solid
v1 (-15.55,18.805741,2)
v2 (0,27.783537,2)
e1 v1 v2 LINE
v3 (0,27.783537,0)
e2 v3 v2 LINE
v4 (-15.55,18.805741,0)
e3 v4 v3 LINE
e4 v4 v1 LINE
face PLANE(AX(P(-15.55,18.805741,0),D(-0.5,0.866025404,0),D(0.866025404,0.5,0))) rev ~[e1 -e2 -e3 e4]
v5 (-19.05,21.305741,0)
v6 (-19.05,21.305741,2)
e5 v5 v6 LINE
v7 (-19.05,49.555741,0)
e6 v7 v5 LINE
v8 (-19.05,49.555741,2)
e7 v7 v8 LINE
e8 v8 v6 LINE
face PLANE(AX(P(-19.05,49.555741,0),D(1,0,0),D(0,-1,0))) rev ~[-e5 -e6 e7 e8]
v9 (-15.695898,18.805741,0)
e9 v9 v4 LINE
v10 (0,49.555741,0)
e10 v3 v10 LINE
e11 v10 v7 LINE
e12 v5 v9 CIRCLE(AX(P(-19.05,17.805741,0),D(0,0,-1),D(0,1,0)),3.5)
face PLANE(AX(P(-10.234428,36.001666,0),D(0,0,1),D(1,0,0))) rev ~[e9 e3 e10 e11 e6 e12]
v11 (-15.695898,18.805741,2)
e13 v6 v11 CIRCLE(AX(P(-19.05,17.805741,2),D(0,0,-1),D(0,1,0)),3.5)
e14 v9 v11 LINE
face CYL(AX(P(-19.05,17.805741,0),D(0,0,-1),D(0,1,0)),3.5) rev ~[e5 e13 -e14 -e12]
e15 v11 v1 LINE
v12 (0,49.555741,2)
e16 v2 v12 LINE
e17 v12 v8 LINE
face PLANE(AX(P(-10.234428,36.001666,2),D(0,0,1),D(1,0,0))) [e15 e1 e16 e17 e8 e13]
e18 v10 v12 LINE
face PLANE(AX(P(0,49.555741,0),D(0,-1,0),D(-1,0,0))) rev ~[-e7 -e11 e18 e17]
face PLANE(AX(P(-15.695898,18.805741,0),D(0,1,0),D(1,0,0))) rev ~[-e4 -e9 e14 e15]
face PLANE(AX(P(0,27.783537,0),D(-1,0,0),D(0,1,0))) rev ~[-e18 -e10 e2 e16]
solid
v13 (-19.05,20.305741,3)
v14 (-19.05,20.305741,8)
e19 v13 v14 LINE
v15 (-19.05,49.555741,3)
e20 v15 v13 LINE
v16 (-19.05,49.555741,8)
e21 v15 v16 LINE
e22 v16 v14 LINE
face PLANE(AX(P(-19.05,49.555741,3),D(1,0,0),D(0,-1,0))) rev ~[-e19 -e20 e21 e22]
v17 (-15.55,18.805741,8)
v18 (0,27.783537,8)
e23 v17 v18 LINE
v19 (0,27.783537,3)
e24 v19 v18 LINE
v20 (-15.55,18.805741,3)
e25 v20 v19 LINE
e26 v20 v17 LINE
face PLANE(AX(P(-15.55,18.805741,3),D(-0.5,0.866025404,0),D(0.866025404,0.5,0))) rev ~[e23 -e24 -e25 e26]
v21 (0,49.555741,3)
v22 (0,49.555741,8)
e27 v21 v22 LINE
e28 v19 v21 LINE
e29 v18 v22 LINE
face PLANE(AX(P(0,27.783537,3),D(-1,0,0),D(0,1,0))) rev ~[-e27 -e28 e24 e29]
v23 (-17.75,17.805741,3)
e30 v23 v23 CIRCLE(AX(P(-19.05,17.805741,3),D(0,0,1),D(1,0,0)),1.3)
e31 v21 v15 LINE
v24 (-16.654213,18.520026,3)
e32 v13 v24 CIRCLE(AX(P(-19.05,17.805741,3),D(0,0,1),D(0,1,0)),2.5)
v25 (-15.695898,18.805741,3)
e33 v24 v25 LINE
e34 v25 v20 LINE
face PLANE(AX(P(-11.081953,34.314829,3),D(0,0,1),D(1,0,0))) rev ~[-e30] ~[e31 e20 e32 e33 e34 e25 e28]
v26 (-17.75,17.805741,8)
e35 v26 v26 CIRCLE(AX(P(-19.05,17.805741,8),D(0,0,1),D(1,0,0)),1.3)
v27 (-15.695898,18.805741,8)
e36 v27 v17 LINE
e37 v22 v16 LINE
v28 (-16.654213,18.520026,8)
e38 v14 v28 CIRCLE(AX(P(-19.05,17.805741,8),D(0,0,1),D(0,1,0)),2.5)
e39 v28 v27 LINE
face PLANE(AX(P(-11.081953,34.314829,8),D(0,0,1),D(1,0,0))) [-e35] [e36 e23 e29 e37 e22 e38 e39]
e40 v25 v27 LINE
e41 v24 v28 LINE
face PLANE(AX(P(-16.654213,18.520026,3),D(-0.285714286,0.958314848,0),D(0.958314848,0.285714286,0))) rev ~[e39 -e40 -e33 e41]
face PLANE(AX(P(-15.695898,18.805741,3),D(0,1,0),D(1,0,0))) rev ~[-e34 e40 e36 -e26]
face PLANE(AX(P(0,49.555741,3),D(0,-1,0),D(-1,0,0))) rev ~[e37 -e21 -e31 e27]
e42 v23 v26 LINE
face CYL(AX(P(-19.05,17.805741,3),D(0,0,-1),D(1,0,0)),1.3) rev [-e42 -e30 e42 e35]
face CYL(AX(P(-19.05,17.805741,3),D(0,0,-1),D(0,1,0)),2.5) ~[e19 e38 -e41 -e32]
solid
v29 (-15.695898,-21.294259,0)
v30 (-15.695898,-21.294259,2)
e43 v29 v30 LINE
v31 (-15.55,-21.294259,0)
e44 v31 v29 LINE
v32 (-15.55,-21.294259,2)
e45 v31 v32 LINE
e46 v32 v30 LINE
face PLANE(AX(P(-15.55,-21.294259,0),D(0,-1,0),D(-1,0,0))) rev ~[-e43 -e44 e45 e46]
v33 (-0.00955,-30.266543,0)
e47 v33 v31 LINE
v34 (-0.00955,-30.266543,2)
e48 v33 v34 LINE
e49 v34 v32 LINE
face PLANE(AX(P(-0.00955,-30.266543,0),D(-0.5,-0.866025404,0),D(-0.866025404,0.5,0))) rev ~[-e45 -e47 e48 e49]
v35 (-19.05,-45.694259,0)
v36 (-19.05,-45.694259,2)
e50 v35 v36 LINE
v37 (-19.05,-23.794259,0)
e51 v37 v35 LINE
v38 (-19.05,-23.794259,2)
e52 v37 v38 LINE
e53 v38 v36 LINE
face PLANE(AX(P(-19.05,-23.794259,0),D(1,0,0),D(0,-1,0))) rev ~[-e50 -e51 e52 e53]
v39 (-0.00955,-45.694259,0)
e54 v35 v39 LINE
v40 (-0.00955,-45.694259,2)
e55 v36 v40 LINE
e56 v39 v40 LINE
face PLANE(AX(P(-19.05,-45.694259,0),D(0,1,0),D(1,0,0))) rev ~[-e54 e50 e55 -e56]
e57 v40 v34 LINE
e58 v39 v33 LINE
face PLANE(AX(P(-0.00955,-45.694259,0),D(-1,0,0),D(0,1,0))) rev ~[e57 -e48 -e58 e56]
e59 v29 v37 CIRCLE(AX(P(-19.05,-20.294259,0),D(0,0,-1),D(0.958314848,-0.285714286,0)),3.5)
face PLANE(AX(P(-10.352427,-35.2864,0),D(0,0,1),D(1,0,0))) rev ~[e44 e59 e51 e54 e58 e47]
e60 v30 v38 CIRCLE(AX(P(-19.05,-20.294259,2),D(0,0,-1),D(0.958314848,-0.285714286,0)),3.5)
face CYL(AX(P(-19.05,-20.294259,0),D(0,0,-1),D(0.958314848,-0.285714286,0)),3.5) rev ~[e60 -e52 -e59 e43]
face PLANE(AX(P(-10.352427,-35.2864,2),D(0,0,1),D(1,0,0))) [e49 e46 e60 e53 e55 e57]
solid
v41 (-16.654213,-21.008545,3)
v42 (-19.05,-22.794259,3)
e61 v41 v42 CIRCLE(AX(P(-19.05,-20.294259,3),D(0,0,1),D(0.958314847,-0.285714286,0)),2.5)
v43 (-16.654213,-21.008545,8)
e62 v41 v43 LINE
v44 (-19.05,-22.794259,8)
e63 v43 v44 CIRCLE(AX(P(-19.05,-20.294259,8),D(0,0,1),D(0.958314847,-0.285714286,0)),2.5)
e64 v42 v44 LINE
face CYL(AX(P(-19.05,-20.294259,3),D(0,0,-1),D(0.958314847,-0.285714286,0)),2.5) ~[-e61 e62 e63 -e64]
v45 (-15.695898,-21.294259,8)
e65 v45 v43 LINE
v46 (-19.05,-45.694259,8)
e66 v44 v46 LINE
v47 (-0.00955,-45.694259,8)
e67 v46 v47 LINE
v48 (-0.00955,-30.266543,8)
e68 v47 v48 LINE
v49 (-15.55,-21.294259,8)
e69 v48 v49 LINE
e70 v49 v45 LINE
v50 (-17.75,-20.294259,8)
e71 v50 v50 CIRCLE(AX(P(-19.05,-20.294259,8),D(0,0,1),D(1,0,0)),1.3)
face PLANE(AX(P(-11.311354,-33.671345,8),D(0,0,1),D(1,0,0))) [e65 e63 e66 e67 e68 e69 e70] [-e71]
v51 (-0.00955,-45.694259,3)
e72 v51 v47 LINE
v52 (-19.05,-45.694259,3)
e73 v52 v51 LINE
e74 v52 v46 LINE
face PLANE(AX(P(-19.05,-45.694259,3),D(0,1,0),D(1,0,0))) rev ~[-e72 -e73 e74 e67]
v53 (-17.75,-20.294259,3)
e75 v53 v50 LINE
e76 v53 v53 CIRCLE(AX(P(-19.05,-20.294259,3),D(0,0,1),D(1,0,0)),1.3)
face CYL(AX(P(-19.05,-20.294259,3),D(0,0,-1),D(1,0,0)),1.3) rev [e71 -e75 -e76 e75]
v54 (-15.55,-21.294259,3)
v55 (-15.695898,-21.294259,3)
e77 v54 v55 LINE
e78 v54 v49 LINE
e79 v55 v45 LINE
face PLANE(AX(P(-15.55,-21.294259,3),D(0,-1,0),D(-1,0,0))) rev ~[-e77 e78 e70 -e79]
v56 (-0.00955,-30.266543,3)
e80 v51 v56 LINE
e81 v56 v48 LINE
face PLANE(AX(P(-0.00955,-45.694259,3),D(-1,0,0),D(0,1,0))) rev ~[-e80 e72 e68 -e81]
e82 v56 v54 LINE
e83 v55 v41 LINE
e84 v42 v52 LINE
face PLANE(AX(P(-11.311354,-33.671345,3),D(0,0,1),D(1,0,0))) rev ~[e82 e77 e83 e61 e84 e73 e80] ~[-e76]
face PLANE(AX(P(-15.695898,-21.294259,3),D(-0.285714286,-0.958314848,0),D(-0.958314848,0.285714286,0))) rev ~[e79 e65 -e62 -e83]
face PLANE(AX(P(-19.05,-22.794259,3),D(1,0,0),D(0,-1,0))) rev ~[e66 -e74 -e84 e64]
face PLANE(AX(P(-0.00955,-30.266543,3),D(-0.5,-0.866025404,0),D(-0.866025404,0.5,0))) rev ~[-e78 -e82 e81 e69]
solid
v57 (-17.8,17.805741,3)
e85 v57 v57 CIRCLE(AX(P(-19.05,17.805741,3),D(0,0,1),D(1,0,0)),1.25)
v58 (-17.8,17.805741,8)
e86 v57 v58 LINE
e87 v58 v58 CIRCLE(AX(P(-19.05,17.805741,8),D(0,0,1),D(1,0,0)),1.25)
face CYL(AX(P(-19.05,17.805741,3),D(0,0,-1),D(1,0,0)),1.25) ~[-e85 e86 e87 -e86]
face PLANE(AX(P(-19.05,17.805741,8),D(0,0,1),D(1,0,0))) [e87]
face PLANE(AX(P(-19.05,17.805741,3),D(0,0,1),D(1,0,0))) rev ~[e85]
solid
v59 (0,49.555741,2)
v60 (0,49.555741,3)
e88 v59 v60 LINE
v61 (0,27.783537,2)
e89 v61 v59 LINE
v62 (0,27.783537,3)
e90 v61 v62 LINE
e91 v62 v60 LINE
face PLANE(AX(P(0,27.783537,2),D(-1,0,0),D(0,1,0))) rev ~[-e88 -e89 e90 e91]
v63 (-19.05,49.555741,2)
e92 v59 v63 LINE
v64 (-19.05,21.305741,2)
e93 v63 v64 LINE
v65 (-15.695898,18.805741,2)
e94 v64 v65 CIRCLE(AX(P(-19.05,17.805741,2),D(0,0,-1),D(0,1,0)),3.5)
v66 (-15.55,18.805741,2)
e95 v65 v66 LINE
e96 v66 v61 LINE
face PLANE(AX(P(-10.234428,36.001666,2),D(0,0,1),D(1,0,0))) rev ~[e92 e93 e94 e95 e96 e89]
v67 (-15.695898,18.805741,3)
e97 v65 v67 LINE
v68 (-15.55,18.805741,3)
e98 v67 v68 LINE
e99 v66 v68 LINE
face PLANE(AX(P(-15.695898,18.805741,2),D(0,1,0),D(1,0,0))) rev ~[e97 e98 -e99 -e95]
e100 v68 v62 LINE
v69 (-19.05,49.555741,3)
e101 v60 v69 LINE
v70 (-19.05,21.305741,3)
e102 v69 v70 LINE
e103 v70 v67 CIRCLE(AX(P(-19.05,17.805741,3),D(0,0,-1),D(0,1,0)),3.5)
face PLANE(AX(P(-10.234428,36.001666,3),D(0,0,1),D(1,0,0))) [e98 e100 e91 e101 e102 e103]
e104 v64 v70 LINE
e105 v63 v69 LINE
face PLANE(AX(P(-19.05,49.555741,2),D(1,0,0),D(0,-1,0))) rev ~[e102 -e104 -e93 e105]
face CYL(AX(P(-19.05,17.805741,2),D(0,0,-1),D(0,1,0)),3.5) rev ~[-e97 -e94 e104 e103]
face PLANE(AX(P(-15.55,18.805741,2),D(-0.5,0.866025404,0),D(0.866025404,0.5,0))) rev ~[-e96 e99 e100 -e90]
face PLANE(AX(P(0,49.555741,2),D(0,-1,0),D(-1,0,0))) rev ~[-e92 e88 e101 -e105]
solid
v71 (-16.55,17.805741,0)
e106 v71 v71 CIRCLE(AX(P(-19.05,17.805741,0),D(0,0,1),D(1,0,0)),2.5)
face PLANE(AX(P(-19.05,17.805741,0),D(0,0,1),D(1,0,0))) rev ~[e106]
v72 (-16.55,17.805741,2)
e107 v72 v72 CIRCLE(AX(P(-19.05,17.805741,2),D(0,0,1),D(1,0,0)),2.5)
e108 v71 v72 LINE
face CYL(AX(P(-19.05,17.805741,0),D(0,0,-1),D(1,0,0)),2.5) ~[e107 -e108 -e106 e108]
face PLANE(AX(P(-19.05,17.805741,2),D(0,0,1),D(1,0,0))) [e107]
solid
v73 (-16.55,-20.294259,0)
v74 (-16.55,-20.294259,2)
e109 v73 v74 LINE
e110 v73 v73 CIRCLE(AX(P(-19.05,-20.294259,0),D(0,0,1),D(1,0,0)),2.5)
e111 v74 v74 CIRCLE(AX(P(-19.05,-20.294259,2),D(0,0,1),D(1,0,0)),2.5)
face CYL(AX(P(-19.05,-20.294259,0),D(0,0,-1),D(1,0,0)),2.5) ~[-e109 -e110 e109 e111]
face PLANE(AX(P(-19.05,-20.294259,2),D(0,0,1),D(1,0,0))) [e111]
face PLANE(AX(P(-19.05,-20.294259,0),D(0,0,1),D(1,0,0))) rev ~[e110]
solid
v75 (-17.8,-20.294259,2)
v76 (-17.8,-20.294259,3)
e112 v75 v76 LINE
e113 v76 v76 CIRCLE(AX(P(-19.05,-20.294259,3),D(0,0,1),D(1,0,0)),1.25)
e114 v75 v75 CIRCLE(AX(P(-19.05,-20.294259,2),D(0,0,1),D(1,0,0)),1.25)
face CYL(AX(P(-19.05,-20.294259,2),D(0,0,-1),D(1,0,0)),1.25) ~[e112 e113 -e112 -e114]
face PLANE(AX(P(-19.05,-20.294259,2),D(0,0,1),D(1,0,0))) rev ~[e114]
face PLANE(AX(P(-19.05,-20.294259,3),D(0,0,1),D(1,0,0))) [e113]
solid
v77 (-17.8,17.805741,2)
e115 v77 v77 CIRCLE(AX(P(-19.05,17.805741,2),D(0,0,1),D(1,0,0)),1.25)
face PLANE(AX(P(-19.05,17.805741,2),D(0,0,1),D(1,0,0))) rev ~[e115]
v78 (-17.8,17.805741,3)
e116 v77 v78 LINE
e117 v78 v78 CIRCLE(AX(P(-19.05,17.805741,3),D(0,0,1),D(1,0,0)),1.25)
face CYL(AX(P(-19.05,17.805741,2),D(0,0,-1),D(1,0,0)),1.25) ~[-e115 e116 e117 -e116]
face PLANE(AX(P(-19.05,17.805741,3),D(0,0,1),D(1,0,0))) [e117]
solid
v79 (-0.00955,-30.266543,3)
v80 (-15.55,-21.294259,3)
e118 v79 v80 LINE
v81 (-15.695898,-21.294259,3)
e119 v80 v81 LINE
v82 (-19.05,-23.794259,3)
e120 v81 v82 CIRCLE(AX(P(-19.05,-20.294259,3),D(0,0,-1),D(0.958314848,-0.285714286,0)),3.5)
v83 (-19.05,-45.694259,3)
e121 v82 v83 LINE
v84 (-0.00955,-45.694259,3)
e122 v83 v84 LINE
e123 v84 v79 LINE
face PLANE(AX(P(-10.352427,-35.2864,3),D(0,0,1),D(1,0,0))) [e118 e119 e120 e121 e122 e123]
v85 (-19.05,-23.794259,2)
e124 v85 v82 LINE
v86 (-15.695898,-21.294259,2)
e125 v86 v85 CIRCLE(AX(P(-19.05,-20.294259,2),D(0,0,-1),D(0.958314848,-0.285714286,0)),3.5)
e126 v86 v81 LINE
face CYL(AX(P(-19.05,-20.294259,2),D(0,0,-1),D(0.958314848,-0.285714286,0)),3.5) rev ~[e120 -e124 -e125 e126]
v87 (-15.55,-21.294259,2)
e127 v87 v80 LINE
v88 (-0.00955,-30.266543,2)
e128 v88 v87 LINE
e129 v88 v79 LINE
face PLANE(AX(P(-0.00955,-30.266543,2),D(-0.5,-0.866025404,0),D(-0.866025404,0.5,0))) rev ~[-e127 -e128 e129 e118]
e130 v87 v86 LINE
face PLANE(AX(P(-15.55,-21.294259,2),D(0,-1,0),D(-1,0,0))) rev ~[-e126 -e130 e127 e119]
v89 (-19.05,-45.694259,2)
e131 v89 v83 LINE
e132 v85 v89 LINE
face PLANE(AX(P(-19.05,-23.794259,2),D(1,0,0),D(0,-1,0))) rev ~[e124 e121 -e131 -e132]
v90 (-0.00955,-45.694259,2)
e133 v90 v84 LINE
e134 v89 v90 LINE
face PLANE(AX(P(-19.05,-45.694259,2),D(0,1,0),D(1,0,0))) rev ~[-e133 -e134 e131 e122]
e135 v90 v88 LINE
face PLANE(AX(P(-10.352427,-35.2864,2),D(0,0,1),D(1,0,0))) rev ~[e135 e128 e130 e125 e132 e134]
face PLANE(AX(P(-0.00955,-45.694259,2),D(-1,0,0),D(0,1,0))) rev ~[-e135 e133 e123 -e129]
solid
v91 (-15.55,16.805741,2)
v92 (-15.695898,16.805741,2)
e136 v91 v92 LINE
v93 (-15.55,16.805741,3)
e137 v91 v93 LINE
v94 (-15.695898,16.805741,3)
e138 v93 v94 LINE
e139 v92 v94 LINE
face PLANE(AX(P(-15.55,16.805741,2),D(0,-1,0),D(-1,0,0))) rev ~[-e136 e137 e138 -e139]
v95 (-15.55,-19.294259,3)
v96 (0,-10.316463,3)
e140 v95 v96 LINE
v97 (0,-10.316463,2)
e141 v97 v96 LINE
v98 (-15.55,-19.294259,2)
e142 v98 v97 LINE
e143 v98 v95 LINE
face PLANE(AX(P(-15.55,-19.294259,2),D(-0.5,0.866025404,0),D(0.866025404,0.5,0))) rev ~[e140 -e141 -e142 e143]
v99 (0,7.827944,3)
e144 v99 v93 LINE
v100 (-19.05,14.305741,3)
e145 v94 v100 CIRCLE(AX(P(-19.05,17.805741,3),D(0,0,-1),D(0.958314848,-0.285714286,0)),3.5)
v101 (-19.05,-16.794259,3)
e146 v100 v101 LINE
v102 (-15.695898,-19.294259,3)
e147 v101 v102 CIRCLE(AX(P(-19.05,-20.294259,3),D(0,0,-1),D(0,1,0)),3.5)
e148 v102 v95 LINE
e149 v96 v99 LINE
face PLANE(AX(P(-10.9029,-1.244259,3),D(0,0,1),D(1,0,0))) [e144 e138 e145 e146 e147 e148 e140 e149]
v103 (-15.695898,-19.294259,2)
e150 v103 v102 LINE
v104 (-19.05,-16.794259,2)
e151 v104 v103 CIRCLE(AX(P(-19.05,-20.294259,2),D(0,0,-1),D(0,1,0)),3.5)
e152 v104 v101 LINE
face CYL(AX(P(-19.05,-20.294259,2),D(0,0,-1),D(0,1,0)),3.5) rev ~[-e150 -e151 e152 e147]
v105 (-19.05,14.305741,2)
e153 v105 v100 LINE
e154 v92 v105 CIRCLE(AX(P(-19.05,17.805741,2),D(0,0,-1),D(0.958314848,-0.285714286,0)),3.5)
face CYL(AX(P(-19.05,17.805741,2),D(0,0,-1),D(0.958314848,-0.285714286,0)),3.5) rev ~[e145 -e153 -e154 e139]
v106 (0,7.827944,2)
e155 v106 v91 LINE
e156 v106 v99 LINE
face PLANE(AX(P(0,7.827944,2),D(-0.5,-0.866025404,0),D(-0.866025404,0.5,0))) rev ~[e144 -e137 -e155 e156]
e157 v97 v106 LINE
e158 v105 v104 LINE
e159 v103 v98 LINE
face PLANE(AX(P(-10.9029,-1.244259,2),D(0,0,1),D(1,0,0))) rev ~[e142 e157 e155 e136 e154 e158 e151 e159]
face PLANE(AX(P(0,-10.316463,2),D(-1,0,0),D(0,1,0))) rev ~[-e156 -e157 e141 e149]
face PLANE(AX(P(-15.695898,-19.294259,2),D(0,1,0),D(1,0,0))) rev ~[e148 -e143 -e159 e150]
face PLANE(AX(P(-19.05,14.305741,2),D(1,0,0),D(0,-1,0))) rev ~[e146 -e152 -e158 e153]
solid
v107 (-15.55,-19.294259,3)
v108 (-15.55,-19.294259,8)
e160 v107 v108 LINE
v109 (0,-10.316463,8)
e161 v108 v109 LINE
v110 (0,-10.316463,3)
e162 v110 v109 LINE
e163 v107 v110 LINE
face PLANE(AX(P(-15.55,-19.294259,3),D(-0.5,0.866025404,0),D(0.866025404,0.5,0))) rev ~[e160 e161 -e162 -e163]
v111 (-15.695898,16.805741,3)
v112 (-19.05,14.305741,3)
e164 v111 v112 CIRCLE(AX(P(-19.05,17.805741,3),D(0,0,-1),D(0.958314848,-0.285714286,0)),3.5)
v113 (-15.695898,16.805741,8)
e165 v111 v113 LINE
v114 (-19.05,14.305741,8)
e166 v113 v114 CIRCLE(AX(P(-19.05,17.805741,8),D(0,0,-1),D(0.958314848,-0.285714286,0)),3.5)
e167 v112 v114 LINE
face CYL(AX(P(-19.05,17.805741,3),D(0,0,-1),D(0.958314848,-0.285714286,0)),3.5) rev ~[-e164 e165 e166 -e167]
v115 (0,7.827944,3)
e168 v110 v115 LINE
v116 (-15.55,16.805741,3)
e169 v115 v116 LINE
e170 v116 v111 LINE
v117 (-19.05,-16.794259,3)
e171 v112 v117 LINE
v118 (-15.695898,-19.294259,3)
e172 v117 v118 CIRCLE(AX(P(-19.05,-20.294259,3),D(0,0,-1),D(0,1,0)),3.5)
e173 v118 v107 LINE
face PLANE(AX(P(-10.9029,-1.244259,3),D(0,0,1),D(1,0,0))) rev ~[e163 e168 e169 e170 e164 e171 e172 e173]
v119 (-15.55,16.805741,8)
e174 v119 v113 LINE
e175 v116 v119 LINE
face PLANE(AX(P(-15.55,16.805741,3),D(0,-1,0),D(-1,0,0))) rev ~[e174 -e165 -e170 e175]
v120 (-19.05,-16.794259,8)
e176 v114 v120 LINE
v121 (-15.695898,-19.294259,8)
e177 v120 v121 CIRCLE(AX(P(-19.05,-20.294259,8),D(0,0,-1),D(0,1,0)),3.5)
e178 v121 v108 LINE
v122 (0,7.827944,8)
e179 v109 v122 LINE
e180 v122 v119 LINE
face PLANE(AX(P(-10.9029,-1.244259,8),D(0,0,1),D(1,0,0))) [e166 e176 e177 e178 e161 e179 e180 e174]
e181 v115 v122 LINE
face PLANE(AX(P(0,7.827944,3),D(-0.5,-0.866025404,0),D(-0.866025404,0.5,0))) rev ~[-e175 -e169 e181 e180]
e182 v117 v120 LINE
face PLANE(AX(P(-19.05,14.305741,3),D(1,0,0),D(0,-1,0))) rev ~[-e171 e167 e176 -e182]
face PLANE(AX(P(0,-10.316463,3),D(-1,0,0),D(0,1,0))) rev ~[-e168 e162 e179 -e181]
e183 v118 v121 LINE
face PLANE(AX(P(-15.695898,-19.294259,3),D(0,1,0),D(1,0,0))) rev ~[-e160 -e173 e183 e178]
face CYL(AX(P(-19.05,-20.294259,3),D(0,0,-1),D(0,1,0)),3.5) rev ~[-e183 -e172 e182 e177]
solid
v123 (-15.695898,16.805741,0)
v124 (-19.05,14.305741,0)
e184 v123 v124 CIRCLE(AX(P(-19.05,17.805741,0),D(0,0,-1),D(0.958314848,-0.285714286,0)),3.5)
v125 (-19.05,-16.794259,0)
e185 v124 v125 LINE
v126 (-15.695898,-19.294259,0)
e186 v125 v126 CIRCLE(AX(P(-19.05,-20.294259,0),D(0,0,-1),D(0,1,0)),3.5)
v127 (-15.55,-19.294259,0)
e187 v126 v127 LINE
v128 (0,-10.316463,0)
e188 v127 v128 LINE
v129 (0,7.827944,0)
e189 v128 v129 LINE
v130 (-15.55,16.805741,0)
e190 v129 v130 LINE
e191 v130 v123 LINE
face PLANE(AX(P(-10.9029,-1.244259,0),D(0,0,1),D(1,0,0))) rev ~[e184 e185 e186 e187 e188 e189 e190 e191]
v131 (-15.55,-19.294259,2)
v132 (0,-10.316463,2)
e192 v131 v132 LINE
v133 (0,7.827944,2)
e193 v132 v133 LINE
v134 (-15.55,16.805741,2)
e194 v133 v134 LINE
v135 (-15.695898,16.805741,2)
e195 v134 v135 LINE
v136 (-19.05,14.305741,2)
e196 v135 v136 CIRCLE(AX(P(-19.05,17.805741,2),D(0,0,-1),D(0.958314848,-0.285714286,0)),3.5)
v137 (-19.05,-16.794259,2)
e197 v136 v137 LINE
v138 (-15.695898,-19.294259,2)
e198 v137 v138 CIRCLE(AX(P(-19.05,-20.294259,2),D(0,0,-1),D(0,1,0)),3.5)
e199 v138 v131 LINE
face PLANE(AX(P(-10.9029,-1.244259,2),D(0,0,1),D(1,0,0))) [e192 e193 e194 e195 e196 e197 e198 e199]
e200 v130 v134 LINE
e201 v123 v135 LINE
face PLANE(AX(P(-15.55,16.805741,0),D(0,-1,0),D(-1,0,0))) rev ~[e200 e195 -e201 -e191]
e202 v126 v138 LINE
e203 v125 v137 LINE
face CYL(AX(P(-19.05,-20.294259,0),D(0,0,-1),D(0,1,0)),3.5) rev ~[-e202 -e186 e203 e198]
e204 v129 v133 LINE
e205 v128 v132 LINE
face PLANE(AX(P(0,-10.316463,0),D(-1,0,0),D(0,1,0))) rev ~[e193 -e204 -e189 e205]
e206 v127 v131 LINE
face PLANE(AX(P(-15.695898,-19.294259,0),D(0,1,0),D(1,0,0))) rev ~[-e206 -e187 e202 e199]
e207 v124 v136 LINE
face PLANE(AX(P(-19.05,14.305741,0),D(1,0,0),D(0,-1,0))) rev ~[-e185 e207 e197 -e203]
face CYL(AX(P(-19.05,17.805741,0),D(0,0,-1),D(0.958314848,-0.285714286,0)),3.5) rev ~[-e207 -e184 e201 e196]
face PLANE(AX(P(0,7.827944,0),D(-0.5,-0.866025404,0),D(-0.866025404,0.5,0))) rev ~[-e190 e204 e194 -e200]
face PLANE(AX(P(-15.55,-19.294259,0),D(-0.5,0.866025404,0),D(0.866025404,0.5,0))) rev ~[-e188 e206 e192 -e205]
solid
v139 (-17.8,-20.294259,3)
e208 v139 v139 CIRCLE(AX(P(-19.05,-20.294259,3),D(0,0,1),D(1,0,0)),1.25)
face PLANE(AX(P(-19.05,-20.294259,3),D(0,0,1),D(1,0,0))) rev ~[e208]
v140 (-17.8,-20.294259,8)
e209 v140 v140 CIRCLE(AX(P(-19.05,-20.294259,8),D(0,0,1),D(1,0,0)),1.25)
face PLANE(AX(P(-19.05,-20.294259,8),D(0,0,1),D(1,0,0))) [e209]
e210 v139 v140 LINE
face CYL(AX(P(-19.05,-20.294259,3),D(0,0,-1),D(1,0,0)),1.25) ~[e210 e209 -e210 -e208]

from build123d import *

# Parameters (mm, degrees)
F1_DEPTH = 2
F0_R     = 2.5
F3_DEPTH = 1
F2_R     = 1.25
F4_R     = 1.3
F5_DEPTH = 5
F4_R_2   = 1.25


# Not quite as in the source:
# - a feature of the source that left no trace in its solid (it failed there, or was rolled back) is left out


with BuildPart() as f1:
    # F0 (on Top) → F1 (new body)
    with BuildSketch(Plane.XY):
        with BuildLine():
            Line((0, 49.5557405042), (-19.05, 49.5557405042))
            Line((-19.05, 49.5557405042), (-19.05, 21.3057405042))
            ThreePointArc((-19.05, 21.3057405042), (-16.9583499337, 20.6119835443), (-15.6958980338, 18.8057405042))
            Line((-15.6958980338, 18.8057405042), (-15.55, 18.8057405042))
            Line((-15.55, 18.8057405042), (0, 27.7835371901))
            Line((0, 27.7835371901), (0, 49.5557405042))
        make_face()
    extrude(amount=F1_DEPTH)


with BuildPart() as f1b:
    # F0 (on Top) → F1, piece 2 (new body)
    with BuildSketch(Plane.XY):
        with BuildLine():
            Line((0, -10.3164628099), (0, 7.8279438183))
            Line((0, 7.8279438183), (-15.55, 16.8057405042))
            Line((-15.55, 16.8057405042), (-15.6958980338, 16.8057405042))
            ThreePointArc((-15.6958980338, 16.8057405042), (-16.9583499337, 14.9994974641), (-19.05, 14.3057405042))
            Line((-19.05, 14.3057405042), (-19.05, -16.7942594958))
            ThreePointArc((-19.05, -16.7942594958), (-16.9583499337, -17.4880164557), (-15.6958980338, -19.2942594958))
            Line((-15.6958980338, -19.2942594958), (-15.55, -19.2942594958))
            Line((-15.55, -19.2942594958), (0, -10.3164628099))
        make_face()
    extrude(amount=F1_DEPTH)


with BuildPart() as f1c:
    # F0 (on Top) → F1, piece 3 (new body)
    with BuildSketch(Plane.XY):
        with BuildLine():
            Line((-19.05, -23.7942594958), (-19.05, -45.6942594958))
            Line((-19.05, -45.6942594958), (-0.0095496495, -45.6942594958))
            Line((-0.0095496495, -45.6942594958), (-0.0095496495, -30.266542689))
            Line((-0.0095496495, -30.266542689), (-15.55, -21.2942594958))
            Line((-15.55, -21.2942594958), (-15.6958980338, -21.2942594958))
            ThreePointArc((-15.6958980338, -21.2942594958), (-16.9583499337, -23.1005025359), (-19.05, -23.7942594958))
        make_face()
    extrude(amount=F1_DEPTH)


with BuildPart() as f1d:
    # F0 (on Top) → F1, piece 4 (new body)
    with BuildSketch(Plane.XY):
        with Locations((-19.05, 17.8057405042)):
            Circle(F0_R)
    extrude(amount=F1_DEPTH)


with BuildPart() as f1e:
    # F0 (on Top) → F1, piece 5 (new body)
    with BuildSketch(Plane.XY):
        with Locations((-19.05, -20.2942594958)):
            Circle(F0_R)
    extrude(amount=F1_DEPTH)


with BuildPart() as f3:
    # F2 (on face) → F3 (new body)
    with BuildSketch(Plane.XY.offset(2)):
        with BuildLine():
            ThreePointArc((-19.05, 21.3057405042), (-16.9583499337, 20.6119835443), (-15.6958980338, 18.8057405042))
            Line((-15.6958980338, 18.8057405042), (-15.55, 18.8057405042))
            Line((-15.55, 18.8057405042), (0, 27.7835371901))
            Line((0, 27.7835371901), (0, 49.5557405042))
            Line((0, 49.5557405042), (-19.05, 49.5557405042))
            Line((-19.05, 49.5557405042), (-19.05, 21.3057405042))
        make_face()
    extrude(amount=F3_DEPTH)


with BuildPart() as f3b:
    # F2 (on face) → F3, piece 2 (new body)
    with BuildSketch(Plane.XY.offset(2)):
        with BuildLine():
            Line((-15.55, 16.8057405042), (-15.6958980338, 16.8057405042))
            ThreePointArc((-15.6958980338, 16.8057405042), (-16.9583499337, 14.9994974641), (-19.05, 14.3057405042))
            Line((-19.05, 14.3057405042), (-19.05, -16.7942594958))
            ThreePointArc((-19.05, -16.7942594958), (-16.9583499337, -17.4880164557), (-15.6958980338, -19.2942594958))
            Line((-15.6958980338, -19.2942594958), (-15.55, -19.2942594958))
            Line((-15.55, -19.2942594958), (0, -10.3164628099))
            Line((0, -10.3164628099), (0, 7.8279438183))
            Line((0, 7.8279438183), (-15.55, 16.8057405042))
        make_face()
    extrude(amount=F3_DEPTH)


with BuildPart() as f3c:
    # F2 (on face) → F3, piece 3 (new body)
    with BuildSketch(Plane.XY.offset(2)):
        with BuildLine():
            Line((-0.0095496495, -45.6942594958), (-0.0095496495, -30.266542689))
            Line((-0.0095496495, -30.266542689), (-15.55, -21.2942594958))
            Line((-15.55, -21.2942594958), (-15.6958980338, -21.2942594958))
            ThreePointArc((-15.6958980338, -21.2942594958), (-16.9583499337, -23.1005025359), (-19.05, -23.7942594958))
            Line((-19.05, -23.7942594958), (-19.05, -45.6942594958))
            Line((-19.05, -45.6942594958), (-0.0095496495, -45.6942594958))
        make_face()
    extrude(amount=F3_DEPTH)


with BuildPart() as f3d:
    # F2 (on face) → F3, piece 4 (new body)
    with BuildSketch(Plane.XY.offset(2)):
        with Locations((-19.05, 17.8057405042)):
            Circle(F2_R)
    extrude(amount=F3_DEPTH)


with BuildPart() as f3e:
    # F2 (on face) → F3, piece 5 (new body)
    with BuildSketch(Plane.XY.offset(2)):
        with Locations((-19.05, -20.2942594958)):
            Circle(F2_R)
    extrude(amount=F3_DEPTH)


with BuildPart() as f5:
    # F4 (on face) → F5 (new body)
    with BuildSketch(Plane.XY.offset(3)):
        with BuildLine():
            Line((-16.6542128813, 18.5200262185), (-15.6958980338, 18.8057405042))
            Line((-15.6958980338, 18.8057405042), (-15.55, 18.8057405042))
            Line((-15.55, 18.8057405042), (0, 27.7835371901))
            Line((0, 27.7835371901), (0, 49.5557405042))
            Line((0, 49.5557405042), (-19.05, 49.5557405042))
            Line((-19.05, 49.5557405042), (-19.05, 21.3057405042))
            Line((-19.05, 21.3057405042), (-19.05, 20.3057405042))
            ThreePointArc((-19.05, 20.3057405042), (-20.5440357617, 15.8012811898), (-16.6542128813, 18.5200262185))
        make_face()
        with Locations((-19.05, 17.8057405042)):
            Circle(F4_R, mode=Mode.SUBTRACT)
    extrude(amount=F5_DEPTH)


with BuildPart() as f5b:
    # F4 (on face) → F5, piece 2 (new body)
    with BuildSketch(Plane.XY.offset(3)):
        with BuildLine():
            Line((0, -10.3164628099), (0, 7.8279438183))
            Line((0, 7.8279438183), (-15.55, 16.8057405042))
            Line((-15.55, 16.8057405042), (-15.6958980338, 16.8057405042))
            ThreePointArc((-15.6958980338, 16.8057405042), (-16.9583499337, 14.9994974641), (-19.05, 14.3057405042))
            Line((-19.05, 14.3057405042), (-19.05, -16.7942594958))
            ThreePointArc((-19.05, -16.7942594958), (-16.9583499337, -17.4880164557), (-15.6958980338, -19.2942594958))
            Line((-15.6958980338, -19.2942594958), (-15.55, -19.2942594958))
            Line((-15.55, -19.2942594958), (0, -10.3164628099))
        make_face()
    extrude(amount=F5_DEPTH)


with BuildPart() as f5c:
    # F4 (on face) → F5, piece 3 (new body)
    with BuildSketch(Plane.XY.offset(3)):
        with BuildLine():
            Line((-19.05, -23.7942594958), (-19.05, -45.6942594958))
            Line((-19.05, -45.6942594958), (-0.0095496495, -45.6942594958))
            Line((-0.0095496495, -45.6942594958), (-0.0095496495, -30.266542689))
            Line((-0.0095496495, -30.266542689), (-15.55, -21.2942594958))
            Line((-15.55, -21.2942594958), (-15.6958980338, -21.2942594958))
            Line((-15.6958980338, -21.2942594958), (-16.6542128813, -21.0085452101))
            ThreePointArc((-16.6542128813, -21.0085452101), (-20.5440357617, -18.2898001815), (-19.05, -22.7942594958))
            Line((-19.05, -22.7942594958), (-19.05, -23.7942594958))
        make_face()
        with Locations((-19.05, -20.2942594958)):
            Circle(F4_R, mode=Mode.SUBTRACT)
    extrude(amount=F5_DEPTH)


with BuildPart() as f5d:
    # F4 (on face) → F5, piece 4 (new body)
    with BuildSketch(Plane.XY.offset(3)):
        with Locations((-19.05, 17.8057405042)):
            Circle(F4_R_2)
    extrude(amount=F5_DEPTH)


with BuildPart() as f5e:
    # F4 (on face) → F5, piece 5 (new body)
    with BuildSketch(Plane.XY.offset(3)):
        with Locations((-19.05, -20.2942594958)):
            Circle(F4_R_2)
    extrude(amount=F5_DEPTH)


solid = Compound([f1.part, f1b.part, f1c.part, f1d.part, f1e.part, f3.part, f3b.part, f3c.part, f3d.part, f3e.part, f5.part, f5b.part, f5c.part, f5d.part, f5e.part])
